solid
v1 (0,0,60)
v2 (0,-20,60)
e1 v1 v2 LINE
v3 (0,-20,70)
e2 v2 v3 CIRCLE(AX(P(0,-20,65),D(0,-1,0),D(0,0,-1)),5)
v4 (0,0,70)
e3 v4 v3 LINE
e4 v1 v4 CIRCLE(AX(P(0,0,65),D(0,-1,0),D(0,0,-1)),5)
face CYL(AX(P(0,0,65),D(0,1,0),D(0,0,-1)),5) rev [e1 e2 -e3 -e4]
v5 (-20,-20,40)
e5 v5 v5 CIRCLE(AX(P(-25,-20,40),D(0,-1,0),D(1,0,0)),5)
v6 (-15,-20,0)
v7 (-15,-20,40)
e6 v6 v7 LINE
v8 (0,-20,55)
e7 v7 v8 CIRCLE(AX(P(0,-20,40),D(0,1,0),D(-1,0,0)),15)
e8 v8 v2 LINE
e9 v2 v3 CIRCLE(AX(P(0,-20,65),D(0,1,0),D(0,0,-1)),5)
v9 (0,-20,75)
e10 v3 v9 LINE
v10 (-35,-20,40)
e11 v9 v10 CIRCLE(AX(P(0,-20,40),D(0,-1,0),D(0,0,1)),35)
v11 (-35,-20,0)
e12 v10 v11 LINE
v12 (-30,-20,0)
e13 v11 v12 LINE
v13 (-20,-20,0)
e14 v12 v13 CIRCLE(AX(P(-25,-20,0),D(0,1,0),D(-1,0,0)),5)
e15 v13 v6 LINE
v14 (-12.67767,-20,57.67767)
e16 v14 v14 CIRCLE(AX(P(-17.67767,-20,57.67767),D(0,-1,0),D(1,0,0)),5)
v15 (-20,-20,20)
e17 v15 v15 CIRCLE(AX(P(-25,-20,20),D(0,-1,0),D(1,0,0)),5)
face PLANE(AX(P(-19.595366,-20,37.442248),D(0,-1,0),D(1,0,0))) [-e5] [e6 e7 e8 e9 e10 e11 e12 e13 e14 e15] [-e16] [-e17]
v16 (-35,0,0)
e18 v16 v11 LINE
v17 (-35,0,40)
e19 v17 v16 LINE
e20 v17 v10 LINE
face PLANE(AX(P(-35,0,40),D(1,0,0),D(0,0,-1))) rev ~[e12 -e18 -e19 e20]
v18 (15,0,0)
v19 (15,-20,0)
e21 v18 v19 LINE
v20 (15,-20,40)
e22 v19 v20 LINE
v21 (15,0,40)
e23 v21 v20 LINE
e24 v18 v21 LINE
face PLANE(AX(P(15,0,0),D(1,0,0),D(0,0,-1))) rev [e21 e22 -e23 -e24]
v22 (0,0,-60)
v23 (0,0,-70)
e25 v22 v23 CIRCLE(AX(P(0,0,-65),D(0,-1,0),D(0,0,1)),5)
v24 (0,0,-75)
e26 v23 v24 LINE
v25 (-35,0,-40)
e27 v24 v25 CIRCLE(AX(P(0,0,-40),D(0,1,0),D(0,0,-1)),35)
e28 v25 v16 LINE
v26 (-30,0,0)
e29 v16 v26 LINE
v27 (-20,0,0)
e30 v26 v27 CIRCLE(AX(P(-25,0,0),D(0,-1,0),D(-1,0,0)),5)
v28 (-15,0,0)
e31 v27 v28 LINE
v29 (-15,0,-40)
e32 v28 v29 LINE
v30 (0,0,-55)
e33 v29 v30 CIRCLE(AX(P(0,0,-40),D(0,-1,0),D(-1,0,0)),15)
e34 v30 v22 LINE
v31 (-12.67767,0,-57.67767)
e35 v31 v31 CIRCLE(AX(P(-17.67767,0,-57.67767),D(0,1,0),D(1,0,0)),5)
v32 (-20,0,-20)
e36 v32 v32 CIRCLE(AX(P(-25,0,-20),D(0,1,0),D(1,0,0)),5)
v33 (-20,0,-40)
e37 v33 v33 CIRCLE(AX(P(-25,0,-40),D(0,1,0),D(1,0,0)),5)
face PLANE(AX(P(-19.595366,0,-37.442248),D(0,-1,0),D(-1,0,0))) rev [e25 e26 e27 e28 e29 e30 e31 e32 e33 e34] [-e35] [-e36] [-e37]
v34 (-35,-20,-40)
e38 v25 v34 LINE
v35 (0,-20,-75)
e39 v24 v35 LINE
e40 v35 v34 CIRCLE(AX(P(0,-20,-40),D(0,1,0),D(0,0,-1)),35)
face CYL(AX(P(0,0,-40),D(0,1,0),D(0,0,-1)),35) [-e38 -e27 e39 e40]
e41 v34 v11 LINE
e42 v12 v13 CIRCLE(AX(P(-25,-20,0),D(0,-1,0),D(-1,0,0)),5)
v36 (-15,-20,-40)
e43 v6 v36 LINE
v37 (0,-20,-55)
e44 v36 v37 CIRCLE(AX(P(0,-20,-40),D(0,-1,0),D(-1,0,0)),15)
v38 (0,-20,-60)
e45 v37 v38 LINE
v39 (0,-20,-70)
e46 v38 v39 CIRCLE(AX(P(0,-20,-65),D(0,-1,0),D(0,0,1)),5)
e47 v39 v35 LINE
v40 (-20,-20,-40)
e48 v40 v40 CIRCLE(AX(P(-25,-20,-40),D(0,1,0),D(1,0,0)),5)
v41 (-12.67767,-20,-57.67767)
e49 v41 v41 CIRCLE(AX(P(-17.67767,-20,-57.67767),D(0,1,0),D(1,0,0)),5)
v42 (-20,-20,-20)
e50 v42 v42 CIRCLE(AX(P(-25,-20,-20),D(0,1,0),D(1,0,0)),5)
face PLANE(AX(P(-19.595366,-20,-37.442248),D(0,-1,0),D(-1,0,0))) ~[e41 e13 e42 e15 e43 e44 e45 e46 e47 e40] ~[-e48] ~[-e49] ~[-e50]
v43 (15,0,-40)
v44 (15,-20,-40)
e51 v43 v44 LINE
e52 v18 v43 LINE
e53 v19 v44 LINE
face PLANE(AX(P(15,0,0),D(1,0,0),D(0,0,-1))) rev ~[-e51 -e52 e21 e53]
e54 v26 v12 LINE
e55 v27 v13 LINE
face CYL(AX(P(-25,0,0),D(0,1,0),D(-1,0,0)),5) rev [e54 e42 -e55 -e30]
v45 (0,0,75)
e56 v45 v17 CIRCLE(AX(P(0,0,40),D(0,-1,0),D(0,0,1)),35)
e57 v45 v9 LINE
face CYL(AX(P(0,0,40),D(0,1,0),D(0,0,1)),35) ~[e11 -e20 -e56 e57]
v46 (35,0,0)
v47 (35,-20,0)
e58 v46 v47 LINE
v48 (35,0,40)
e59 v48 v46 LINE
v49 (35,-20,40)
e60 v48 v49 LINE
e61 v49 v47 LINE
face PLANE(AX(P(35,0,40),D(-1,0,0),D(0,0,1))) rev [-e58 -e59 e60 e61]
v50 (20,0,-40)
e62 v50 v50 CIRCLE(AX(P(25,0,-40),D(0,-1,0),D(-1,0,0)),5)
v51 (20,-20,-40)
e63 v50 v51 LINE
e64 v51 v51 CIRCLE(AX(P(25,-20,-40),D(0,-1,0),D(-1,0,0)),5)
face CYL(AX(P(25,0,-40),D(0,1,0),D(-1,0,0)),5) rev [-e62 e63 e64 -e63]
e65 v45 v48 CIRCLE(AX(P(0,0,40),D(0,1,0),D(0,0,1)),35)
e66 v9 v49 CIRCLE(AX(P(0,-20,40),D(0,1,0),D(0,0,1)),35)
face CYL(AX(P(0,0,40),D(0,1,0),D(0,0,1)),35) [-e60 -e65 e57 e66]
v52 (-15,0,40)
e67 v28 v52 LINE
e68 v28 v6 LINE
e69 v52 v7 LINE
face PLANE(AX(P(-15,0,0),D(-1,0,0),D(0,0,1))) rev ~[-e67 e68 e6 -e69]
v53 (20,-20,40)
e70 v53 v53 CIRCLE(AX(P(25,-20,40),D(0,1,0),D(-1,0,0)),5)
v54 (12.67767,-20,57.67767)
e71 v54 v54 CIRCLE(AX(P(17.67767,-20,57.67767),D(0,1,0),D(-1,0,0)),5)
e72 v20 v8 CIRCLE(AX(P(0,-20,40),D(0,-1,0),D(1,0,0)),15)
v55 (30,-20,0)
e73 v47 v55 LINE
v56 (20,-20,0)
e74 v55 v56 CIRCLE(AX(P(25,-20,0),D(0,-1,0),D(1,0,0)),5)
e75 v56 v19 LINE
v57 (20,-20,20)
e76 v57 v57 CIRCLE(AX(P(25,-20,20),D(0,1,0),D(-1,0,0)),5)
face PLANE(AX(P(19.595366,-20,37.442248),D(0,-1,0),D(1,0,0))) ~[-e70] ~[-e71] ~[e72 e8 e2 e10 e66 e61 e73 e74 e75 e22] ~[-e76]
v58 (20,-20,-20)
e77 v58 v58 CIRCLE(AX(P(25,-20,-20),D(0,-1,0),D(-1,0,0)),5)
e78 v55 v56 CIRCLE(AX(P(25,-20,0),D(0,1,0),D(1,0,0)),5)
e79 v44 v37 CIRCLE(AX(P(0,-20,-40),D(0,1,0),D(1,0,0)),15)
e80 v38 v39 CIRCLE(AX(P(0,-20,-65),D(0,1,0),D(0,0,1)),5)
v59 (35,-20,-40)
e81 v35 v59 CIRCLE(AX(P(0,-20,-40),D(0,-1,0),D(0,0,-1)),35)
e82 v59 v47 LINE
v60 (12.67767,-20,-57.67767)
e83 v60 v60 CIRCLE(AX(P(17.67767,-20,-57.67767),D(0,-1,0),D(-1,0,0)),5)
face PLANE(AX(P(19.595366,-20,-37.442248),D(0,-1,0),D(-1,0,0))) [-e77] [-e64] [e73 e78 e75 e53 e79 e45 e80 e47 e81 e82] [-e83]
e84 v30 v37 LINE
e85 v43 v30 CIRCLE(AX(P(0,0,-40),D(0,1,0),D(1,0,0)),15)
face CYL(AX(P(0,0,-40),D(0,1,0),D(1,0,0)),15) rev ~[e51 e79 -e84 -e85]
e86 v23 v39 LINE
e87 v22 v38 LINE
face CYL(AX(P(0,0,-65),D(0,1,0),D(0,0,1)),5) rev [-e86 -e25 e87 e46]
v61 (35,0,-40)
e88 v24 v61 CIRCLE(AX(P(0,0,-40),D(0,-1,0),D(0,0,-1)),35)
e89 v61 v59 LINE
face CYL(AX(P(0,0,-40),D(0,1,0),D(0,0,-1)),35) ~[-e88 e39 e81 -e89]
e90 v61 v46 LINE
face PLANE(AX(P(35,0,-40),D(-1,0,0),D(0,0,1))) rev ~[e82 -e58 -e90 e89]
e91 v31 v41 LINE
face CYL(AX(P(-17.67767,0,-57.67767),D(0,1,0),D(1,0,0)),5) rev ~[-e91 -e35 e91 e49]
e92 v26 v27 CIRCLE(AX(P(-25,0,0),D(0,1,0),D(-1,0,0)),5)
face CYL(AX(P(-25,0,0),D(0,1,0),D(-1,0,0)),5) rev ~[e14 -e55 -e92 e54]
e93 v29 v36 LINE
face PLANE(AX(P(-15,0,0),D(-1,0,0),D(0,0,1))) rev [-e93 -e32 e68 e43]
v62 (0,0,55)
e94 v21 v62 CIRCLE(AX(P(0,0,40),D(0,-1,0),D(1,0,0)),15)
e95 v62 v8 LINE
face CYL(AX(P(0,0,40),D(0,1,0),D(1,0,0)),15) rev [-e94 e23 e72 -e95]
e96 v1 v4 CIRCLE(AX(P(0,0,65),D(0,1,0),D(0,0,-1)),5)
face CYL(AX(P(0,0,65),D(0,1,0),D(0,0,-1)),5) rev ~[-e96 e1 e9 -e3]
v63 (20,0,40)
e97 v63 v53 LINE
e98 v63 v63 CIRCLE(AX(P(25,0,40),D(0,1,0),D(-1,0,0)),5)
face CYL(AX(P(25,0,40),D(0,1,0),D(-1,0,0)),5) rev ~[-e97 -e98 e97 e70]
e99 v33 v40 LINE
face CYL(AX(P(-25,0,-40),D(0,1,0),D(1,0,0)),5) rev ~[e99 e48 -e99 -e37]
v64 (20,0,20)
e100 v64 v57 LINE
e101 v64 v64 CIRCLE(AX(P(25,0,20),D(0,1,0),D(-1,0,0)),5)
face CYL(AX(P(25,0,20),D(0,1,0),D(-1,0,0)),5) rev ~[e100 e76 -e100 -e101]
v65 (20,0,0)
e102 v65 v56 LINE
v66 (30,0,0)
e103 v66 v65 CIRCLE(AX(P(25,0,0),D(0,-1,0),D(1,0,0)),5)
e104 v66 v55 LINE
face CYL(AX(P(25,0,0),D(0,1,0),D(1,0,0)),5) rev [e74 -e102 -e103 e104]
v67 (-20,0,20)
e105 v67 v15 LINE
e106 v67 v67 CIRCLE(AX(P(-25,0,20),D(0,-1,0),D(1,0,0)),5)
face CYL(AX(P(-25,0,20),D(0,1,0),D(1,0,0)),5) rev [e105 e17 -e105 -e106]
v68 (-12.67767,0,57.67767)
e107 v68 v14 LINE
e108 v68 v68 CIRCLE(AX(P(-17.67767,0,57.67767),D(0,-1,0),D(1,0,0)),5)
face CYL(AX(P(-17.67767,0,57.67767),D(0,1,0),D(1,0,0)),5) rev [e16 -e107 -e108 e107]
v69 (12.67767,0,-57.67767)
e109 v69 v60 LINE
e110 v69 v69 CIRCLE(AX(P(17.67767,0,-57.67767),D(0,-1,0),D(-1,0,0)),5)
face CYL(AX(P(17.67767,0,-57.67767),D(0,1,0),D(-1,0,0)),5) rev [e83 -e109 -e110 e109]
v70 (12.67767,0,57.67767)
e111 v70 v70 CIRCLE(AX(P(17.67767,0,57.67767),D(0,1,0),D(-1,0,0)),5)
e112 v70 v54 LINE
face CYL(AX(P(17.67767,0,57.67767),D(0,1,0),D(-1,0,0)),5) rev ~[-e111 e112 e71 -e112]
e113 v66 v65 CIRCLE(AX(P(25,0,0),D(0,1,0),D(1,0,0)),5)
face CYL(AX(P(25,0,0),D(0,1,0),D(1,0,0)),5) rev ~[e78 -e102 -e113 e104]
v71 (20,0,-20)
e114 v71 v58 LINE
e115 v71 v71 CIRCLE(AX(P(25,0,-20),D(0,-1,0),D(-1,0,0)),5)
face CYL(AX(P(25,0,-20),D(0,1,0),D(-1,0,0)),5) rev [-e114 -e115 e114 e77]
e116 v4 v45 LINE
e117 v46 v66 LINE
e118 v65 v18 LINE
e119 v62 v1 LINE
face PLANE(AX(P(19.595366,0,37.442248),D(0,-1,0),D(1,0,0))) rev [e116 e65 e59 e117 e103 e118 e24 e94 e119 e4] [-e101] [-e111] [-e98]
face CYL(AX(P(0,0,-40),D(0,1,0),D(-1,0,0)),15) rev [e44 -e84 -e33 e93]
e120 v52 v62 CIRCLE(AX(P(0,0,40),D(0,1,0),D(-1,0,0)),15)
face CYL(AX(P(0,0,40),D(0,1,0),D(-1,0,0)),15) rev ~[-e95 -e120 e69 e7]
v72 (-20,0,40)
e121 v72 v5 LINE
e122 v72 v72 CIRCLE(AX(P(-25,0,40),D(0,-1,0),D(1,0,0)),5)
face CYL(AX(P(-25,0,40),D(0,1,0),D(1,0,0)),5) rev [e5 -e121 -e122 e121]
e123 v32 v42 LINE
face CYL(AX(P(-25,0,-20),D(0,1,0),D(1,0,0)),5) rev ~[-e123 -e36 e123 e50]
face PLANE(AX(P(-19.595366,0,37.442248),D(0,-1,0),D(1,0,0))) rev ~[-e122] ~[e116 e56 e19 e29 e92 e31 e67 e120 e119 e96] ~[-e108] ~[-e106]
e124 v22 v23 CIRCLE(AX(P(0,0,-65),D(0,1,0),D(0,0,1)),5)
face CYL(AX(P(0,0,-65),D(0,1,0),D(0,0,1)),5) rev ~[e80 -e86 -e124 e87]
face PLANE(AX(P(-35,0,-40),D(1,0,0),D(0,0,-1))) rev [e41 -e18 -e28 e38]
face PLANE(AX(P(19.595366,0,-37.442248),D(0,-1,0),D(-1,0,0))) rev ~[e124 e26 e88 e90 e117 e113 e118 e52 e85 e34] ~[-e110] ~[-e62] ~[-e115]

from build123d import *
from build123d import SkipClean  # not in build123d's __all__

# Parameters (mm, degrees)
F0_R     = 5
F1_DEPTH = 20


with BuildPart() as f1:
    # F0 (on Front) → F1 (new body)
    with BuildSketch(Plane.XZ):
        with BuildLine():
            ThreePointArc((-15, 40), (-10.6066017178, 50.6066017178), (0, 55))
            Line((0, 55), (0, 60))
            ThreePointArc((0, 60), (-5, 65), (0, 70))
            Line((0, 70), (0, 75))
            ThreePointArc((0, 75), (-24.7487373415, 64.7487373415), (-35, 40))
            Line((-35, 40), (-35, 0))
            Line((-35, 0), (-30, 0))
            ThreePointArc((-30, 0), (-25, 5), (-20, 0))
            Line((-20, 0), (-15, 0))
            Line((-15, 0), (-15, 40))
        make_face()
        with Locations((-25, 20)):
            Circle(F0_R, mode=Mode.SUBTRACT)
        with Locations((-25, 40)):
            Circle(F0_R, mode=Mode.SUBTRACT)
        with Locations((-17.6776695297, 57.6776695297)):
            Circle(F0_R, mode=Mode.SUBTRACT)
    extrude(amount=F1_DEPTH)

    # F2: F1 across plane


with BuildPart() as f1_1:
    add(f1.part, clean=False)
    with SkipClean():  # cleaning this boolean's faces spoils the solid; the shape is the same uncleaned
        add(f1.part.mirror(Plane.XY), clean=False)

    # F3: F1 across plane


with BuildPart() as f1_2:
    add(f1_1.part, clean=False)
    with SkipClean():  # cleaning this boolean's faces spoils the solid; the shape is the same uncleaned
        add(f1_1.part.mirror(Plane.YZ), clean=False)


solid = f1_2.part
